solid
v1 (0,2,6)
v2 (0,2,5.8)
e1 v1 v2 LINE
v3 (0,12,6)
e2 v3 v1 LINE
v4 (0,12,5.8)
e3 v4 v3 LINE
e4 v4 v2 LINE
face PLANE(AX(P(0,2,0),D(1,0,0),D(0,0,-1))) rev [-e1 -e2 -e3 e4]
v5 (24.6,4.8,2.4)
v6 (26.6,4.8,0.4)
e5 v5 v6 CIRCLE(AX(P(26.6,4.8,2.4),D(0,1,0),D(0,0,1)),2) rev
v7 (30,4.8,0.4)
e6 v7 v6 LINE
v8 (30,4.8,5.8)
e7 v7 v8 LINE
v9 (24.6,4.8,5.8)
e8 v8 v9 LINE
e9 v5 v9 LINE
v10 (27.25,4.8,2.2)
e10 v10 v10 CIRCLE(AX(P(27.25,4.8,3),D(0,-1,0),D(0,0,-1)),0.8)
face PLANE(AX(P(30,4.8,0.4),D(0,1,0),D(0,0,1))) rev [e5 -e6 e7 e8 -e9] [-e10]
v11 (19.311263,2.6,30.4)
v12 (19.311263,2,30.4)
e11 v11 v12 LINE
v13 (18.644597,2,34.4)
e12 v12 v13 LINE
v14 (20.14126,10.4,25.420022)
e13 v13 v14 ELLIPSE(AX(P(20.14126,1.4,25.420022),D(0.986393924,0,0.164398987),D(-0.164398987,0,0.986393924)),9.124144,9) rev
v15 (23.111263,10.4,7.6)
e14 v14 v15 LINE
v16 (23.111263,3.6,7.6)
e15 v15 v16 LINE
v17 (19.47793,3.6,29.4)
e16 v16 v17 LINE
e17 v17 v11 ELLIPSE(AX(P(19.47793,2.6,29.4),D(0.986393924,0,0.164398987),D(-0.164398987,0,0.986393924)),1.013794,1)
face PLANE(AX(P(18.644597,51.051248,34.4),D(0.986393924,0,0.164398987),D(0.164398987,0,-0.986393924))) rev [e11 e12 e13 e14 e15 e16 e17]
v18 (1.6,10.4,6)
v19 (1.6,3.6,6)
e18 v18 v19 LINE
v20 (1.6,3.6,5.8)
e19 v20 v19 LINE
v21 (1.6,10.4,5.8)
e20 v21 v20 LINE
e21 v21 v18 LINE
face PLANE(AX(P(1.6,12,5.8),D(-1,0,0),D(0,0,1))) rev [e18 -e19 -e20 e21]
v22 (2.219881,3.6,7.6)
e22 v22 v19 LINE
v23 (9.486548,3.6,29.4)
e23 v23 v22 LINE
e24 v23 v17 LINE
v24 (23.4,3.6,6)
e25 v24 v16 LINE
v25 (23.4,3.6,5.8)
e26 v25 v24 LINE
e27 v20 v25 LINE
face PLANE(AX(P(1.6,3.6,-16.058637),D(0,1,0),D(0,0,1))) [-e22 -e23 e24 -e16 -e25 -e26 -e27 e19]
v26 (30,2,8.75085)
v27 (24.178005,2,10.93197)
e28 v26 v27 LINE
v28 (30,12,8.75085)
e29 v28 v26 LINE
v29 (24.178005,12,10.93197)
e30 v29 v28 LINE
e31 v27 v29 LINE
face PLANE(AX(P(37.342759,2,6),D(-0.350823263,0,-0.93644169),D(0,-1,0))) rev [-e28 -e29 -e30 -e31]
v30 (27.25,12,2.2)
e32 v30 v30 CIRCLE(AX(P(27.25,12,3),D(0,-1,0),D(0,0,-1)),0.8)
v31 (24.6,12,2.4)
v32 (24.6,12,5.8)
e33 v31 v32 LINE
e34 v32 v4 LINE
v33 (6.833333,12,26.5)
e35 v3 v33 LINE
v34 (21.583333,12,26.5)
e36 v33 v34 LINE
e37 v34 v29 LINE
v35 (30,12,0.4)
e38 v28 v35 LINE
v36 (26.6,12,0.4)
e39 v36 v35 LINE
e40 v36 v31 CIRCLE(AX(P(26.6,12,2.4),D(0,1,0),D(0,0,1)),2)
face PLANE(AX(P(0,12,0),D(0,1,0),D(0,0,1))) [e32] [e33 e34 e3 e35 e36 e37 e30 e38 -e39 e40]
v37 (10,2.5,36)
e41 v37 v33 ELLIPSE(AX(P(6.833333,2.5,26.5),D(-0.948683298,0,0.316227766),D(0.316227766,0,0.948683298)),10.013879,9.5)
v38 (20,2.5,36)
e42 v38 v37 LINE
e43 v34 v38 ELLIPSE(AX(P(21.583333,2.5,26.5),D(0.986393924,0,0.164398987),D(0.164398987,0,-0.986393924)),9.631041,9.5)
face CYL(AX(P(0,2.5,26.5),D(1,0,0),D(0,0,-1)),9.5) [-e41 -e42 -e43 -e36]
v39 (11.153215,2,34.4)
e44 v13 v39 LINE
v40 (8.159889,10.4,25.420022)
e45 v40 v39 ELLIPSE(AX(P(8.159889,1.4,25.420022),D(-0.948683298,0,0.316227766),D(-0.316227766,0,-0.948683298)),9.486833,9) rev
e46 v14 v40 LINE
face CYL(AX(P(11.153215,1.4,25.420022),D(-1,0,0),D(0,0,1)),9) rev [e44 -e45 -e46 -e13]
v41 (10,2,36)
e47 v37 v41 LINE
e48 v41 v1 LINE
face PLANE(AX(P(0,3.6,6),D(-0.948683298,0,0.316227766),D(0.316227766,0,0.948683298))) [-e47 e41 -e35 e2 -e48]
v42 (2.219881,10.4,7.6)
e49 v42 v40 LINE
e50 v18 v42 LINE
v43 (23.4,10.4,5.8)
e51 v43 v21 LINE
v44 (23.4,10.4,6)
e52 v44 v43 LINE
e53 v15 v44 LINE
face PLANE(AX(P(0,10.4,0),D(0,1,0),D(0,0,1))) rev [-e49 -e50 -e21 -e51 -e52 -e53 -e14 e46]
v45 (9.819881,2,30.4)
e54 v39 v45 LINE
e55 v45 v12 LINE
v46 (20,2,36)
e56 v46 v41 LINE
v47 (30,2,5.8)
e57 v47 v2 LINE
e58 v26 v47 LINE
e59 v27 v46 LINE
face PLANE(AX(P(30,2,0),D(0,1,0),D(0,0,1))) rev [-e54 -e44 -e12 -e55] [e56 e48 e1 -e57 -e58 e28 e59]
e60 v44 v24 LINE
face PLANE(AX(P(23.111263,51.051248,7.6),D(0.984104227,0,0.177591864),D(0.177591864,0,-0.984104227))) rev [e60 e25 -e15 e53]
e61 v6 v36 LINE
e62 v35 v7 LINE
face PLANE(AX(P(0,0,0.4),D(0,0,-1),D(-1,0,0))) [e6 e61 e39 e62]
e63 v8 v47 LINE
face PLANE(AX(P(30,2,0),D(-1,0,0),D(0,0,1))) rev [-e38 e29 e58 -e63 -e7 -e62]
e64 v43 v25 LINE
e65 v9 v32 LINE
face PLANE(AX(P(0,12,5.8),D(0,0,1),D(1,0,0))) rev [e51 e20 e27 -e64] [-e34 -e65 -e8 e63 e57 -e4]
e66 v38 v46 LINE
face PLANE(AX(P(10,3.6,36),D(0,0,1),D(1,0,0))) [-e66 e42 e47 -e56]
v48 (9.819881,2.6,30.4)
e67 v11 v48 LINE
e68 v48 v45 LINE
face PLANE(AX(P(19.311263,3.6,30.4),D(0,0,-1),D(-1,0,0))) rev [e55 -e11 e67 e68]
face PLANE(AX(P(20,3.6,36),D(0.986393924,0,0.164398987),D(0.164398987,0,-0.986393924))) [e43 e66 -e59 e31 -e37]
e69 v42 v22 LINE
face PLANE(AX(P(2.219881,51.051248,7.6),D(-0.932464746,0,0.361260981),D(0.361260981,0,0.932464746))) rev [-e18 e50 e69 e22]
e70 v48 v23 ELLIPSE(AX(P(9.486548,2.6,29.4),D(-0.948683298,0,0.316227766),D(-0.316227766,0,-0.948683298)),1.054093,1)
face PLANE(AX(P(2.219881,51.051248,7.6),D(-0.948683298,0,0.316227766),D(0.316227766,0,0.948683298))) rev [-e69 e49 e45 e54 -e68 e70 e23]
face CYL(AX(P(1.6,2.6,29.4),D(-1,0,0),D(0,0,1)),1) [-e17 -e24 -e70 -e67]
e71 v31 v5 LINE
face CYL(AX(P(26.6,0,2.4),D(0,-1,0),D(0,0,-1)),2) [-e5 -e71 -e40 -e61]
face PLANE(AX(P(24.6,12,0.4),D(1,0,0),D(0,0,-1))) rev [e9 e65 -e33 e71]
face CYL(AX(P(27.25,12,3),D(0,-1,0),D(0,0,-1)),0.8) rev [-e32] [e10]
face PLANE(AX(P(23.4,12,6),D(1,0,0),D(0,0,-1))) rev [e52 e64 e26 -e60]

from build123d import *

# Parameters (mm, degrees)
SKETCH_1_W          = 30
SKETCH_1_H          = 6
EXTRUDE_1_DEPTH     = 2
SKETCH_2_R          = 0.8
CUT_EXTRUDE_1_DEPTH = 2
SKETCH_3_W          = 1.6
SKETCH_3_H          = 0.2
EXTRUDE_2_DEPTH     = 10
SKETCH_4_W          = 21.8
SKETCH_4_H          = 0.2
EXTRUDE_3_DEPTH     = 1.6
SKETCH_5_W          = 5
SKETCH_5_H          = 0.2
EXTRUDE_4_DEPTH     = 10
SKETCH_6_W          = 5.4
SKETCH_6_H          = 7.2
EXTRUDE_5_DEPTH     = 5.4
FILLET_1_R          = 2
SKETCH_7_R          = 0.8
CUT_EXTRUDE_2_DEPTH = 32.429922049
SKETCH_8_W          = 6
SKETCH_8_H          = 2
CUT_EXTRUDE_3_DEPTH = 33.86335345
SKETCH_9_W          = 21.8
SKETCH_9_H          = 1.6
EXTRUDE_7_DEPTH     = 0.2
EXTRUDE_9_DEPTH     = 1.6
EXTRUDE_10_REACH    = 49.608
EXTRUDE_11_DEPTH    = 1.6
CUT_EXTRUDE_4_DEPTH = 1.6
FILLET_2_R          = 9
FILLET_3_R          = 9.5
FILLET_4_R          = 1
CHAMFER_1_SIZE      = 12.342759107
CHAMFER_1_SIZE_2    = 5


with BuildPart() as part:
    # 草图1 → 凸台-拉伸1 (new body)
    with BuildSketch(Plane(origin=(0, 0, 0), x_dir=(1, 0, 0), z_dir=(0, 1, 0))):
        with Locations((15, -3)):
            Rectangle(SKETCH_1_W, SKETCH_1_H)
    extrude(amount=EXTRUDE_1_DEPTH)

    # 草图2 → 切除-拉伸1 (cut)
    with BuildSketch(Plane(origin=(0, 2, 0), x_dir=(1, 0, 0), z_dir=(0, 1, 0))):
        with Locations(Location((27.25, -3, 0), (0, 0, 270))):
            Circle(SKETCH_2_R)
    extrude(amount=-CUT_EXTRUDE_1_DEPTH, mode=Mode.SUBTRACT)

    # 草图3 → 凸台-拉伸2 (add)
    with BuildSketch(Plane(origin=(0, 2, 0), x_dir=(1, 0, 0), z_dir=(0, 1, 0))):
        with Locations((0.8, -5.9)):
            Rectangle(SKETCH_3_W, SKETCH_3_H)
        with Locations((24.2, -5.9)):
            Rectangle(SKETCH_3_W, SKETCH_3_H)
    extrude(amount=EXTRUDE_2_DEPTH)

    # 草图4 → 凸台-拉伸3 (add)
    with BuildSketch(Plane(origin=(0, 12, 0), x_dir=(1, 0, 0), z_dir=(0, 1, 0))):
        with Locations((12.5, -5.9)):
            Rectangle(SKETCH_4_W, SKETCH_4_H)
    extrude(amount=-EXTRUDE_3_DEPTH)

    # 草图5 → 凸台-拉伸4 (add)
    with BuildSketch(Plane(origin=(0, 2, 0), x_dir=(1, 0, 0), z_dir=(0, 1, 0))):
        with Locations((27.5, -5.9)):
            Rectangle(SKETCH_5_W, SKETCH_5_H)
    extrude(amount=EXTRUDE_4_DEPTH)

    # 草图6 → 凸台-拉伸5 (add)
    with BuildSketch(Plane(origin=(0, 0, 5.8), x_dir=(-1, 0, 0), z_dir=(0, 0, -1))):
        with Locations((-27.3, 8.4)):
            Rectangle(SKETCH_6_W, SKETCH_6_H)
    extrude(amount=EXTRUDE_5_DEPTH)

    # 圆角1
    fillet_1_edges = [part.edges().sort_by_distance(p)[0] for p in [
        (24.6, 8.4, 0.4),
    ]]
    fillet(fillet_1_edges, radius=FILLET_1_R)

    # 草图7 → 切除-拉伸2 (cut, through all)
    with BuildSketch(Plane(origin=(0, 4.8, 0), x_dir=(-1, 0, 0), z_dir=(0, -1, 0))):
        with Locations(Location((-27.25, -3, 0), (0, 0, 270))):
            Circle(SKETCH_7_R)
    extrude(amount=-CUT_EXTRUDE_2_DEPTH, mode=Mode.SUBTRACT)

    # 草图8 → 切除-拉伸3 (cut, through all)
    with BuildSketch(Plane.ZY):
        with Locations((3, 1)):
            Rectangle(SKETCH_8_W, SKETCH_8_H)
    extrude(amount=-CUT_EXTRUDE_3_DEPTH, mode=Mode.SUBTRACT)

    # 草图9 → 凸台-拉伸7 (add)
    with BuildSketch(Plane.XY.offset(6)):
        with Locations((12.5, 2.8)):
            Rectangle(SKETCH_9_W, SKETCH_9_H)
    extrude(amount=-EXTRUDE_7_DEPTH)

    # 草图11 → 凸台-拉伸9 (add)
    with BuildSketch(Plane(origin=(0, 2, 0), x_dir=(-1, 0, 0), z_dir=(0, -1, 0))):
        Polygon((0, -6), (-10, -36), (-20, -36), (-25, -6), align=None)
    extrude(amount=-EXTRUDE_9_DEPTH)

    # 凸台-拉伸10: up to this face of the body (flat: up to its plane)
    extrude_10_end = Plane(part.part.faces().sort_by_distance((25.077544524, 12, 3.686395467))[0])
    # 草图12 → 凸台-拉伸10 (add, up to the picked face)
    with BuildSketch(Plane(origin=(0, 3.6, 0), x_dir=(1, 0, 0), z_dir=(0, 1, 0)), mode=Mode.PRIVATE) as extrude_10_sk1:
        Polygon((2.219881419, -7.6), (11.153214752, -34.4), (18.644596659, -34.4), (23.111263325, -7.6), (23.4, -6), (25, -6), (20, -36), (10, -36), (0, -6), (1.6, -6), align=None)
    extrude_10_tool1 = split(extrude(extrude_10_sk1.sketch, amount=EXTRUDE_10_REACH, mode=Mode.PRIVATE), bisect_by=extrude_10_end, keep=Keep.BOTH, mode=Mode.PRIVATE)
    add(extrude_10_tool1.solids().sort_by(Axis((6.316075, 3.6, 21.123491), (0, 1, 0)))[0])

    # 草图13 → 凸台-拉伸11 (add)
    with BuildSketch(Plane(origin=(0, 12, 0), x_dir=(1, 0, 0), z_dir=(0, 1, 0))):
        Polygon((1.6, -5.8), (1.6, -6), (2.219881419, -7.6), (11.153214752, -34.4), (18.644596659, -34.4), (23.111263325, -7.6), (23.4, -6), (23.4, -5.8), align=None)
    extrude(amount=-EXTRUDE_11_DEPTH)

    # 草图15 → 切除-拉伸4 (cut)
    with BuildSketch(Plane.XZ.offset(-2)):
        Polygon((11.153214752, 34.4), (18.644596659, 34.4), (19.311263325, 30.4), (9.819881419, 30.4), align=None)
    extrude(amount=-CUT_EXTRUDE_4_DEPTH, mode=Mode.SUBTRACT)

    # 圆角2
    # the kernel refuses this fillet: 9 mm, written as the material it adds along each edge
    with BuildSketch(Plane(origin=(-11.296729569, 10.4, 34.4), x_dir=(0, -1, 0), z_dir=(1, 0, 0))) as fillet_2_piece_1_section:
        with BuildLine():
            CenterArc((9, 8.979977728), FILLET_2_R, 180, 86.177446271)
            Line((0, 8.979977728), (-0.18, 8.979977728))
            Line((-0.18, 8.979977728), (-0.18, 0))
            Line((-0.18, 0), (0, -0.18))
            ThreePointArc((0, -0.18), (4.2, -0.18), (8.388, -0.179599555))
            Line((8.388, -0.179599555), (8.4, 0))
        make_face()
    fillet_2_piece_1 = extrude(amount=52.391270548, mode=Mode.PRIVATE)
    fillet_2_piece_1 = split(fillet_2_piece_1, bisect_by=Plane(origin=(10.82791011, 8.54108789, 33.424086075), z_dir=(0.9486832980505115, 0, -0.3162277660168449)), keep=Keep.TOP, mode=Mode.PRIVATE)
    fillet_2_piece_1 = split(fillet_2_piece_1, bisect_by=Plane(origin=(18.906334999, 8.54108789, 32.829569958), z_dir=(-0.9863939238321403, 0, -0.16439898730537805)), keep=Keep.TOP, mode=Mode.PRIVATE)
    add(fillet_2_piece_1)

    # 圆角3
    fillet_3_edges = [part.edges().sort_by_distance(p)[0] for p in [
        (15, 12, 36),
    ]]
    fillet(fillet_3_edges, radius=FILLET_3_R)

    # 圆角4
    fillet_4_edges = [part.edges().sort_by_distance(p)[0] for p in [
        (14.565572372, 3.6, 30.4),
    ]]
    fillet(fillet_4_edges, radius=FILLET_4_R)

    # 倒角1
    # the kernel refuses this chamfer: 12.342759107, 5 mm, written as the material it adds along each edge
    with BuildSketch(Plane(origin=(25, 12, 6), x_dir=(0.9999085325872852, 0, -0.013525030837001994), z_dir=(0, -1, 0))) as chamfer_1_piece_1_section:
        Polygon((CHAMFER_1_SIZE * 0.99990853261, CHAMFER_1_SIZE * 0.0135250308373), (-CHAMFER_1_SIZE_2 * 0.177724958393, CHAMFER_1_SIZE_2 * 0.984080199559), (0, 0), align=None)
    chamfer_1_piece_1 = extrude(amount=10, mode=Mode.PRIVATE)
    chamfer_1_piece_1 = split(chamfer_1_piece_1, bisect_by=Plane(origin=(30, 7, 7.970980812), z_dir=(-1, 0, 0)), keep=Keep.TOP, mode=Mode.PRIVATE)
    add(chamfer_1_piece_1)


solid = part.part
